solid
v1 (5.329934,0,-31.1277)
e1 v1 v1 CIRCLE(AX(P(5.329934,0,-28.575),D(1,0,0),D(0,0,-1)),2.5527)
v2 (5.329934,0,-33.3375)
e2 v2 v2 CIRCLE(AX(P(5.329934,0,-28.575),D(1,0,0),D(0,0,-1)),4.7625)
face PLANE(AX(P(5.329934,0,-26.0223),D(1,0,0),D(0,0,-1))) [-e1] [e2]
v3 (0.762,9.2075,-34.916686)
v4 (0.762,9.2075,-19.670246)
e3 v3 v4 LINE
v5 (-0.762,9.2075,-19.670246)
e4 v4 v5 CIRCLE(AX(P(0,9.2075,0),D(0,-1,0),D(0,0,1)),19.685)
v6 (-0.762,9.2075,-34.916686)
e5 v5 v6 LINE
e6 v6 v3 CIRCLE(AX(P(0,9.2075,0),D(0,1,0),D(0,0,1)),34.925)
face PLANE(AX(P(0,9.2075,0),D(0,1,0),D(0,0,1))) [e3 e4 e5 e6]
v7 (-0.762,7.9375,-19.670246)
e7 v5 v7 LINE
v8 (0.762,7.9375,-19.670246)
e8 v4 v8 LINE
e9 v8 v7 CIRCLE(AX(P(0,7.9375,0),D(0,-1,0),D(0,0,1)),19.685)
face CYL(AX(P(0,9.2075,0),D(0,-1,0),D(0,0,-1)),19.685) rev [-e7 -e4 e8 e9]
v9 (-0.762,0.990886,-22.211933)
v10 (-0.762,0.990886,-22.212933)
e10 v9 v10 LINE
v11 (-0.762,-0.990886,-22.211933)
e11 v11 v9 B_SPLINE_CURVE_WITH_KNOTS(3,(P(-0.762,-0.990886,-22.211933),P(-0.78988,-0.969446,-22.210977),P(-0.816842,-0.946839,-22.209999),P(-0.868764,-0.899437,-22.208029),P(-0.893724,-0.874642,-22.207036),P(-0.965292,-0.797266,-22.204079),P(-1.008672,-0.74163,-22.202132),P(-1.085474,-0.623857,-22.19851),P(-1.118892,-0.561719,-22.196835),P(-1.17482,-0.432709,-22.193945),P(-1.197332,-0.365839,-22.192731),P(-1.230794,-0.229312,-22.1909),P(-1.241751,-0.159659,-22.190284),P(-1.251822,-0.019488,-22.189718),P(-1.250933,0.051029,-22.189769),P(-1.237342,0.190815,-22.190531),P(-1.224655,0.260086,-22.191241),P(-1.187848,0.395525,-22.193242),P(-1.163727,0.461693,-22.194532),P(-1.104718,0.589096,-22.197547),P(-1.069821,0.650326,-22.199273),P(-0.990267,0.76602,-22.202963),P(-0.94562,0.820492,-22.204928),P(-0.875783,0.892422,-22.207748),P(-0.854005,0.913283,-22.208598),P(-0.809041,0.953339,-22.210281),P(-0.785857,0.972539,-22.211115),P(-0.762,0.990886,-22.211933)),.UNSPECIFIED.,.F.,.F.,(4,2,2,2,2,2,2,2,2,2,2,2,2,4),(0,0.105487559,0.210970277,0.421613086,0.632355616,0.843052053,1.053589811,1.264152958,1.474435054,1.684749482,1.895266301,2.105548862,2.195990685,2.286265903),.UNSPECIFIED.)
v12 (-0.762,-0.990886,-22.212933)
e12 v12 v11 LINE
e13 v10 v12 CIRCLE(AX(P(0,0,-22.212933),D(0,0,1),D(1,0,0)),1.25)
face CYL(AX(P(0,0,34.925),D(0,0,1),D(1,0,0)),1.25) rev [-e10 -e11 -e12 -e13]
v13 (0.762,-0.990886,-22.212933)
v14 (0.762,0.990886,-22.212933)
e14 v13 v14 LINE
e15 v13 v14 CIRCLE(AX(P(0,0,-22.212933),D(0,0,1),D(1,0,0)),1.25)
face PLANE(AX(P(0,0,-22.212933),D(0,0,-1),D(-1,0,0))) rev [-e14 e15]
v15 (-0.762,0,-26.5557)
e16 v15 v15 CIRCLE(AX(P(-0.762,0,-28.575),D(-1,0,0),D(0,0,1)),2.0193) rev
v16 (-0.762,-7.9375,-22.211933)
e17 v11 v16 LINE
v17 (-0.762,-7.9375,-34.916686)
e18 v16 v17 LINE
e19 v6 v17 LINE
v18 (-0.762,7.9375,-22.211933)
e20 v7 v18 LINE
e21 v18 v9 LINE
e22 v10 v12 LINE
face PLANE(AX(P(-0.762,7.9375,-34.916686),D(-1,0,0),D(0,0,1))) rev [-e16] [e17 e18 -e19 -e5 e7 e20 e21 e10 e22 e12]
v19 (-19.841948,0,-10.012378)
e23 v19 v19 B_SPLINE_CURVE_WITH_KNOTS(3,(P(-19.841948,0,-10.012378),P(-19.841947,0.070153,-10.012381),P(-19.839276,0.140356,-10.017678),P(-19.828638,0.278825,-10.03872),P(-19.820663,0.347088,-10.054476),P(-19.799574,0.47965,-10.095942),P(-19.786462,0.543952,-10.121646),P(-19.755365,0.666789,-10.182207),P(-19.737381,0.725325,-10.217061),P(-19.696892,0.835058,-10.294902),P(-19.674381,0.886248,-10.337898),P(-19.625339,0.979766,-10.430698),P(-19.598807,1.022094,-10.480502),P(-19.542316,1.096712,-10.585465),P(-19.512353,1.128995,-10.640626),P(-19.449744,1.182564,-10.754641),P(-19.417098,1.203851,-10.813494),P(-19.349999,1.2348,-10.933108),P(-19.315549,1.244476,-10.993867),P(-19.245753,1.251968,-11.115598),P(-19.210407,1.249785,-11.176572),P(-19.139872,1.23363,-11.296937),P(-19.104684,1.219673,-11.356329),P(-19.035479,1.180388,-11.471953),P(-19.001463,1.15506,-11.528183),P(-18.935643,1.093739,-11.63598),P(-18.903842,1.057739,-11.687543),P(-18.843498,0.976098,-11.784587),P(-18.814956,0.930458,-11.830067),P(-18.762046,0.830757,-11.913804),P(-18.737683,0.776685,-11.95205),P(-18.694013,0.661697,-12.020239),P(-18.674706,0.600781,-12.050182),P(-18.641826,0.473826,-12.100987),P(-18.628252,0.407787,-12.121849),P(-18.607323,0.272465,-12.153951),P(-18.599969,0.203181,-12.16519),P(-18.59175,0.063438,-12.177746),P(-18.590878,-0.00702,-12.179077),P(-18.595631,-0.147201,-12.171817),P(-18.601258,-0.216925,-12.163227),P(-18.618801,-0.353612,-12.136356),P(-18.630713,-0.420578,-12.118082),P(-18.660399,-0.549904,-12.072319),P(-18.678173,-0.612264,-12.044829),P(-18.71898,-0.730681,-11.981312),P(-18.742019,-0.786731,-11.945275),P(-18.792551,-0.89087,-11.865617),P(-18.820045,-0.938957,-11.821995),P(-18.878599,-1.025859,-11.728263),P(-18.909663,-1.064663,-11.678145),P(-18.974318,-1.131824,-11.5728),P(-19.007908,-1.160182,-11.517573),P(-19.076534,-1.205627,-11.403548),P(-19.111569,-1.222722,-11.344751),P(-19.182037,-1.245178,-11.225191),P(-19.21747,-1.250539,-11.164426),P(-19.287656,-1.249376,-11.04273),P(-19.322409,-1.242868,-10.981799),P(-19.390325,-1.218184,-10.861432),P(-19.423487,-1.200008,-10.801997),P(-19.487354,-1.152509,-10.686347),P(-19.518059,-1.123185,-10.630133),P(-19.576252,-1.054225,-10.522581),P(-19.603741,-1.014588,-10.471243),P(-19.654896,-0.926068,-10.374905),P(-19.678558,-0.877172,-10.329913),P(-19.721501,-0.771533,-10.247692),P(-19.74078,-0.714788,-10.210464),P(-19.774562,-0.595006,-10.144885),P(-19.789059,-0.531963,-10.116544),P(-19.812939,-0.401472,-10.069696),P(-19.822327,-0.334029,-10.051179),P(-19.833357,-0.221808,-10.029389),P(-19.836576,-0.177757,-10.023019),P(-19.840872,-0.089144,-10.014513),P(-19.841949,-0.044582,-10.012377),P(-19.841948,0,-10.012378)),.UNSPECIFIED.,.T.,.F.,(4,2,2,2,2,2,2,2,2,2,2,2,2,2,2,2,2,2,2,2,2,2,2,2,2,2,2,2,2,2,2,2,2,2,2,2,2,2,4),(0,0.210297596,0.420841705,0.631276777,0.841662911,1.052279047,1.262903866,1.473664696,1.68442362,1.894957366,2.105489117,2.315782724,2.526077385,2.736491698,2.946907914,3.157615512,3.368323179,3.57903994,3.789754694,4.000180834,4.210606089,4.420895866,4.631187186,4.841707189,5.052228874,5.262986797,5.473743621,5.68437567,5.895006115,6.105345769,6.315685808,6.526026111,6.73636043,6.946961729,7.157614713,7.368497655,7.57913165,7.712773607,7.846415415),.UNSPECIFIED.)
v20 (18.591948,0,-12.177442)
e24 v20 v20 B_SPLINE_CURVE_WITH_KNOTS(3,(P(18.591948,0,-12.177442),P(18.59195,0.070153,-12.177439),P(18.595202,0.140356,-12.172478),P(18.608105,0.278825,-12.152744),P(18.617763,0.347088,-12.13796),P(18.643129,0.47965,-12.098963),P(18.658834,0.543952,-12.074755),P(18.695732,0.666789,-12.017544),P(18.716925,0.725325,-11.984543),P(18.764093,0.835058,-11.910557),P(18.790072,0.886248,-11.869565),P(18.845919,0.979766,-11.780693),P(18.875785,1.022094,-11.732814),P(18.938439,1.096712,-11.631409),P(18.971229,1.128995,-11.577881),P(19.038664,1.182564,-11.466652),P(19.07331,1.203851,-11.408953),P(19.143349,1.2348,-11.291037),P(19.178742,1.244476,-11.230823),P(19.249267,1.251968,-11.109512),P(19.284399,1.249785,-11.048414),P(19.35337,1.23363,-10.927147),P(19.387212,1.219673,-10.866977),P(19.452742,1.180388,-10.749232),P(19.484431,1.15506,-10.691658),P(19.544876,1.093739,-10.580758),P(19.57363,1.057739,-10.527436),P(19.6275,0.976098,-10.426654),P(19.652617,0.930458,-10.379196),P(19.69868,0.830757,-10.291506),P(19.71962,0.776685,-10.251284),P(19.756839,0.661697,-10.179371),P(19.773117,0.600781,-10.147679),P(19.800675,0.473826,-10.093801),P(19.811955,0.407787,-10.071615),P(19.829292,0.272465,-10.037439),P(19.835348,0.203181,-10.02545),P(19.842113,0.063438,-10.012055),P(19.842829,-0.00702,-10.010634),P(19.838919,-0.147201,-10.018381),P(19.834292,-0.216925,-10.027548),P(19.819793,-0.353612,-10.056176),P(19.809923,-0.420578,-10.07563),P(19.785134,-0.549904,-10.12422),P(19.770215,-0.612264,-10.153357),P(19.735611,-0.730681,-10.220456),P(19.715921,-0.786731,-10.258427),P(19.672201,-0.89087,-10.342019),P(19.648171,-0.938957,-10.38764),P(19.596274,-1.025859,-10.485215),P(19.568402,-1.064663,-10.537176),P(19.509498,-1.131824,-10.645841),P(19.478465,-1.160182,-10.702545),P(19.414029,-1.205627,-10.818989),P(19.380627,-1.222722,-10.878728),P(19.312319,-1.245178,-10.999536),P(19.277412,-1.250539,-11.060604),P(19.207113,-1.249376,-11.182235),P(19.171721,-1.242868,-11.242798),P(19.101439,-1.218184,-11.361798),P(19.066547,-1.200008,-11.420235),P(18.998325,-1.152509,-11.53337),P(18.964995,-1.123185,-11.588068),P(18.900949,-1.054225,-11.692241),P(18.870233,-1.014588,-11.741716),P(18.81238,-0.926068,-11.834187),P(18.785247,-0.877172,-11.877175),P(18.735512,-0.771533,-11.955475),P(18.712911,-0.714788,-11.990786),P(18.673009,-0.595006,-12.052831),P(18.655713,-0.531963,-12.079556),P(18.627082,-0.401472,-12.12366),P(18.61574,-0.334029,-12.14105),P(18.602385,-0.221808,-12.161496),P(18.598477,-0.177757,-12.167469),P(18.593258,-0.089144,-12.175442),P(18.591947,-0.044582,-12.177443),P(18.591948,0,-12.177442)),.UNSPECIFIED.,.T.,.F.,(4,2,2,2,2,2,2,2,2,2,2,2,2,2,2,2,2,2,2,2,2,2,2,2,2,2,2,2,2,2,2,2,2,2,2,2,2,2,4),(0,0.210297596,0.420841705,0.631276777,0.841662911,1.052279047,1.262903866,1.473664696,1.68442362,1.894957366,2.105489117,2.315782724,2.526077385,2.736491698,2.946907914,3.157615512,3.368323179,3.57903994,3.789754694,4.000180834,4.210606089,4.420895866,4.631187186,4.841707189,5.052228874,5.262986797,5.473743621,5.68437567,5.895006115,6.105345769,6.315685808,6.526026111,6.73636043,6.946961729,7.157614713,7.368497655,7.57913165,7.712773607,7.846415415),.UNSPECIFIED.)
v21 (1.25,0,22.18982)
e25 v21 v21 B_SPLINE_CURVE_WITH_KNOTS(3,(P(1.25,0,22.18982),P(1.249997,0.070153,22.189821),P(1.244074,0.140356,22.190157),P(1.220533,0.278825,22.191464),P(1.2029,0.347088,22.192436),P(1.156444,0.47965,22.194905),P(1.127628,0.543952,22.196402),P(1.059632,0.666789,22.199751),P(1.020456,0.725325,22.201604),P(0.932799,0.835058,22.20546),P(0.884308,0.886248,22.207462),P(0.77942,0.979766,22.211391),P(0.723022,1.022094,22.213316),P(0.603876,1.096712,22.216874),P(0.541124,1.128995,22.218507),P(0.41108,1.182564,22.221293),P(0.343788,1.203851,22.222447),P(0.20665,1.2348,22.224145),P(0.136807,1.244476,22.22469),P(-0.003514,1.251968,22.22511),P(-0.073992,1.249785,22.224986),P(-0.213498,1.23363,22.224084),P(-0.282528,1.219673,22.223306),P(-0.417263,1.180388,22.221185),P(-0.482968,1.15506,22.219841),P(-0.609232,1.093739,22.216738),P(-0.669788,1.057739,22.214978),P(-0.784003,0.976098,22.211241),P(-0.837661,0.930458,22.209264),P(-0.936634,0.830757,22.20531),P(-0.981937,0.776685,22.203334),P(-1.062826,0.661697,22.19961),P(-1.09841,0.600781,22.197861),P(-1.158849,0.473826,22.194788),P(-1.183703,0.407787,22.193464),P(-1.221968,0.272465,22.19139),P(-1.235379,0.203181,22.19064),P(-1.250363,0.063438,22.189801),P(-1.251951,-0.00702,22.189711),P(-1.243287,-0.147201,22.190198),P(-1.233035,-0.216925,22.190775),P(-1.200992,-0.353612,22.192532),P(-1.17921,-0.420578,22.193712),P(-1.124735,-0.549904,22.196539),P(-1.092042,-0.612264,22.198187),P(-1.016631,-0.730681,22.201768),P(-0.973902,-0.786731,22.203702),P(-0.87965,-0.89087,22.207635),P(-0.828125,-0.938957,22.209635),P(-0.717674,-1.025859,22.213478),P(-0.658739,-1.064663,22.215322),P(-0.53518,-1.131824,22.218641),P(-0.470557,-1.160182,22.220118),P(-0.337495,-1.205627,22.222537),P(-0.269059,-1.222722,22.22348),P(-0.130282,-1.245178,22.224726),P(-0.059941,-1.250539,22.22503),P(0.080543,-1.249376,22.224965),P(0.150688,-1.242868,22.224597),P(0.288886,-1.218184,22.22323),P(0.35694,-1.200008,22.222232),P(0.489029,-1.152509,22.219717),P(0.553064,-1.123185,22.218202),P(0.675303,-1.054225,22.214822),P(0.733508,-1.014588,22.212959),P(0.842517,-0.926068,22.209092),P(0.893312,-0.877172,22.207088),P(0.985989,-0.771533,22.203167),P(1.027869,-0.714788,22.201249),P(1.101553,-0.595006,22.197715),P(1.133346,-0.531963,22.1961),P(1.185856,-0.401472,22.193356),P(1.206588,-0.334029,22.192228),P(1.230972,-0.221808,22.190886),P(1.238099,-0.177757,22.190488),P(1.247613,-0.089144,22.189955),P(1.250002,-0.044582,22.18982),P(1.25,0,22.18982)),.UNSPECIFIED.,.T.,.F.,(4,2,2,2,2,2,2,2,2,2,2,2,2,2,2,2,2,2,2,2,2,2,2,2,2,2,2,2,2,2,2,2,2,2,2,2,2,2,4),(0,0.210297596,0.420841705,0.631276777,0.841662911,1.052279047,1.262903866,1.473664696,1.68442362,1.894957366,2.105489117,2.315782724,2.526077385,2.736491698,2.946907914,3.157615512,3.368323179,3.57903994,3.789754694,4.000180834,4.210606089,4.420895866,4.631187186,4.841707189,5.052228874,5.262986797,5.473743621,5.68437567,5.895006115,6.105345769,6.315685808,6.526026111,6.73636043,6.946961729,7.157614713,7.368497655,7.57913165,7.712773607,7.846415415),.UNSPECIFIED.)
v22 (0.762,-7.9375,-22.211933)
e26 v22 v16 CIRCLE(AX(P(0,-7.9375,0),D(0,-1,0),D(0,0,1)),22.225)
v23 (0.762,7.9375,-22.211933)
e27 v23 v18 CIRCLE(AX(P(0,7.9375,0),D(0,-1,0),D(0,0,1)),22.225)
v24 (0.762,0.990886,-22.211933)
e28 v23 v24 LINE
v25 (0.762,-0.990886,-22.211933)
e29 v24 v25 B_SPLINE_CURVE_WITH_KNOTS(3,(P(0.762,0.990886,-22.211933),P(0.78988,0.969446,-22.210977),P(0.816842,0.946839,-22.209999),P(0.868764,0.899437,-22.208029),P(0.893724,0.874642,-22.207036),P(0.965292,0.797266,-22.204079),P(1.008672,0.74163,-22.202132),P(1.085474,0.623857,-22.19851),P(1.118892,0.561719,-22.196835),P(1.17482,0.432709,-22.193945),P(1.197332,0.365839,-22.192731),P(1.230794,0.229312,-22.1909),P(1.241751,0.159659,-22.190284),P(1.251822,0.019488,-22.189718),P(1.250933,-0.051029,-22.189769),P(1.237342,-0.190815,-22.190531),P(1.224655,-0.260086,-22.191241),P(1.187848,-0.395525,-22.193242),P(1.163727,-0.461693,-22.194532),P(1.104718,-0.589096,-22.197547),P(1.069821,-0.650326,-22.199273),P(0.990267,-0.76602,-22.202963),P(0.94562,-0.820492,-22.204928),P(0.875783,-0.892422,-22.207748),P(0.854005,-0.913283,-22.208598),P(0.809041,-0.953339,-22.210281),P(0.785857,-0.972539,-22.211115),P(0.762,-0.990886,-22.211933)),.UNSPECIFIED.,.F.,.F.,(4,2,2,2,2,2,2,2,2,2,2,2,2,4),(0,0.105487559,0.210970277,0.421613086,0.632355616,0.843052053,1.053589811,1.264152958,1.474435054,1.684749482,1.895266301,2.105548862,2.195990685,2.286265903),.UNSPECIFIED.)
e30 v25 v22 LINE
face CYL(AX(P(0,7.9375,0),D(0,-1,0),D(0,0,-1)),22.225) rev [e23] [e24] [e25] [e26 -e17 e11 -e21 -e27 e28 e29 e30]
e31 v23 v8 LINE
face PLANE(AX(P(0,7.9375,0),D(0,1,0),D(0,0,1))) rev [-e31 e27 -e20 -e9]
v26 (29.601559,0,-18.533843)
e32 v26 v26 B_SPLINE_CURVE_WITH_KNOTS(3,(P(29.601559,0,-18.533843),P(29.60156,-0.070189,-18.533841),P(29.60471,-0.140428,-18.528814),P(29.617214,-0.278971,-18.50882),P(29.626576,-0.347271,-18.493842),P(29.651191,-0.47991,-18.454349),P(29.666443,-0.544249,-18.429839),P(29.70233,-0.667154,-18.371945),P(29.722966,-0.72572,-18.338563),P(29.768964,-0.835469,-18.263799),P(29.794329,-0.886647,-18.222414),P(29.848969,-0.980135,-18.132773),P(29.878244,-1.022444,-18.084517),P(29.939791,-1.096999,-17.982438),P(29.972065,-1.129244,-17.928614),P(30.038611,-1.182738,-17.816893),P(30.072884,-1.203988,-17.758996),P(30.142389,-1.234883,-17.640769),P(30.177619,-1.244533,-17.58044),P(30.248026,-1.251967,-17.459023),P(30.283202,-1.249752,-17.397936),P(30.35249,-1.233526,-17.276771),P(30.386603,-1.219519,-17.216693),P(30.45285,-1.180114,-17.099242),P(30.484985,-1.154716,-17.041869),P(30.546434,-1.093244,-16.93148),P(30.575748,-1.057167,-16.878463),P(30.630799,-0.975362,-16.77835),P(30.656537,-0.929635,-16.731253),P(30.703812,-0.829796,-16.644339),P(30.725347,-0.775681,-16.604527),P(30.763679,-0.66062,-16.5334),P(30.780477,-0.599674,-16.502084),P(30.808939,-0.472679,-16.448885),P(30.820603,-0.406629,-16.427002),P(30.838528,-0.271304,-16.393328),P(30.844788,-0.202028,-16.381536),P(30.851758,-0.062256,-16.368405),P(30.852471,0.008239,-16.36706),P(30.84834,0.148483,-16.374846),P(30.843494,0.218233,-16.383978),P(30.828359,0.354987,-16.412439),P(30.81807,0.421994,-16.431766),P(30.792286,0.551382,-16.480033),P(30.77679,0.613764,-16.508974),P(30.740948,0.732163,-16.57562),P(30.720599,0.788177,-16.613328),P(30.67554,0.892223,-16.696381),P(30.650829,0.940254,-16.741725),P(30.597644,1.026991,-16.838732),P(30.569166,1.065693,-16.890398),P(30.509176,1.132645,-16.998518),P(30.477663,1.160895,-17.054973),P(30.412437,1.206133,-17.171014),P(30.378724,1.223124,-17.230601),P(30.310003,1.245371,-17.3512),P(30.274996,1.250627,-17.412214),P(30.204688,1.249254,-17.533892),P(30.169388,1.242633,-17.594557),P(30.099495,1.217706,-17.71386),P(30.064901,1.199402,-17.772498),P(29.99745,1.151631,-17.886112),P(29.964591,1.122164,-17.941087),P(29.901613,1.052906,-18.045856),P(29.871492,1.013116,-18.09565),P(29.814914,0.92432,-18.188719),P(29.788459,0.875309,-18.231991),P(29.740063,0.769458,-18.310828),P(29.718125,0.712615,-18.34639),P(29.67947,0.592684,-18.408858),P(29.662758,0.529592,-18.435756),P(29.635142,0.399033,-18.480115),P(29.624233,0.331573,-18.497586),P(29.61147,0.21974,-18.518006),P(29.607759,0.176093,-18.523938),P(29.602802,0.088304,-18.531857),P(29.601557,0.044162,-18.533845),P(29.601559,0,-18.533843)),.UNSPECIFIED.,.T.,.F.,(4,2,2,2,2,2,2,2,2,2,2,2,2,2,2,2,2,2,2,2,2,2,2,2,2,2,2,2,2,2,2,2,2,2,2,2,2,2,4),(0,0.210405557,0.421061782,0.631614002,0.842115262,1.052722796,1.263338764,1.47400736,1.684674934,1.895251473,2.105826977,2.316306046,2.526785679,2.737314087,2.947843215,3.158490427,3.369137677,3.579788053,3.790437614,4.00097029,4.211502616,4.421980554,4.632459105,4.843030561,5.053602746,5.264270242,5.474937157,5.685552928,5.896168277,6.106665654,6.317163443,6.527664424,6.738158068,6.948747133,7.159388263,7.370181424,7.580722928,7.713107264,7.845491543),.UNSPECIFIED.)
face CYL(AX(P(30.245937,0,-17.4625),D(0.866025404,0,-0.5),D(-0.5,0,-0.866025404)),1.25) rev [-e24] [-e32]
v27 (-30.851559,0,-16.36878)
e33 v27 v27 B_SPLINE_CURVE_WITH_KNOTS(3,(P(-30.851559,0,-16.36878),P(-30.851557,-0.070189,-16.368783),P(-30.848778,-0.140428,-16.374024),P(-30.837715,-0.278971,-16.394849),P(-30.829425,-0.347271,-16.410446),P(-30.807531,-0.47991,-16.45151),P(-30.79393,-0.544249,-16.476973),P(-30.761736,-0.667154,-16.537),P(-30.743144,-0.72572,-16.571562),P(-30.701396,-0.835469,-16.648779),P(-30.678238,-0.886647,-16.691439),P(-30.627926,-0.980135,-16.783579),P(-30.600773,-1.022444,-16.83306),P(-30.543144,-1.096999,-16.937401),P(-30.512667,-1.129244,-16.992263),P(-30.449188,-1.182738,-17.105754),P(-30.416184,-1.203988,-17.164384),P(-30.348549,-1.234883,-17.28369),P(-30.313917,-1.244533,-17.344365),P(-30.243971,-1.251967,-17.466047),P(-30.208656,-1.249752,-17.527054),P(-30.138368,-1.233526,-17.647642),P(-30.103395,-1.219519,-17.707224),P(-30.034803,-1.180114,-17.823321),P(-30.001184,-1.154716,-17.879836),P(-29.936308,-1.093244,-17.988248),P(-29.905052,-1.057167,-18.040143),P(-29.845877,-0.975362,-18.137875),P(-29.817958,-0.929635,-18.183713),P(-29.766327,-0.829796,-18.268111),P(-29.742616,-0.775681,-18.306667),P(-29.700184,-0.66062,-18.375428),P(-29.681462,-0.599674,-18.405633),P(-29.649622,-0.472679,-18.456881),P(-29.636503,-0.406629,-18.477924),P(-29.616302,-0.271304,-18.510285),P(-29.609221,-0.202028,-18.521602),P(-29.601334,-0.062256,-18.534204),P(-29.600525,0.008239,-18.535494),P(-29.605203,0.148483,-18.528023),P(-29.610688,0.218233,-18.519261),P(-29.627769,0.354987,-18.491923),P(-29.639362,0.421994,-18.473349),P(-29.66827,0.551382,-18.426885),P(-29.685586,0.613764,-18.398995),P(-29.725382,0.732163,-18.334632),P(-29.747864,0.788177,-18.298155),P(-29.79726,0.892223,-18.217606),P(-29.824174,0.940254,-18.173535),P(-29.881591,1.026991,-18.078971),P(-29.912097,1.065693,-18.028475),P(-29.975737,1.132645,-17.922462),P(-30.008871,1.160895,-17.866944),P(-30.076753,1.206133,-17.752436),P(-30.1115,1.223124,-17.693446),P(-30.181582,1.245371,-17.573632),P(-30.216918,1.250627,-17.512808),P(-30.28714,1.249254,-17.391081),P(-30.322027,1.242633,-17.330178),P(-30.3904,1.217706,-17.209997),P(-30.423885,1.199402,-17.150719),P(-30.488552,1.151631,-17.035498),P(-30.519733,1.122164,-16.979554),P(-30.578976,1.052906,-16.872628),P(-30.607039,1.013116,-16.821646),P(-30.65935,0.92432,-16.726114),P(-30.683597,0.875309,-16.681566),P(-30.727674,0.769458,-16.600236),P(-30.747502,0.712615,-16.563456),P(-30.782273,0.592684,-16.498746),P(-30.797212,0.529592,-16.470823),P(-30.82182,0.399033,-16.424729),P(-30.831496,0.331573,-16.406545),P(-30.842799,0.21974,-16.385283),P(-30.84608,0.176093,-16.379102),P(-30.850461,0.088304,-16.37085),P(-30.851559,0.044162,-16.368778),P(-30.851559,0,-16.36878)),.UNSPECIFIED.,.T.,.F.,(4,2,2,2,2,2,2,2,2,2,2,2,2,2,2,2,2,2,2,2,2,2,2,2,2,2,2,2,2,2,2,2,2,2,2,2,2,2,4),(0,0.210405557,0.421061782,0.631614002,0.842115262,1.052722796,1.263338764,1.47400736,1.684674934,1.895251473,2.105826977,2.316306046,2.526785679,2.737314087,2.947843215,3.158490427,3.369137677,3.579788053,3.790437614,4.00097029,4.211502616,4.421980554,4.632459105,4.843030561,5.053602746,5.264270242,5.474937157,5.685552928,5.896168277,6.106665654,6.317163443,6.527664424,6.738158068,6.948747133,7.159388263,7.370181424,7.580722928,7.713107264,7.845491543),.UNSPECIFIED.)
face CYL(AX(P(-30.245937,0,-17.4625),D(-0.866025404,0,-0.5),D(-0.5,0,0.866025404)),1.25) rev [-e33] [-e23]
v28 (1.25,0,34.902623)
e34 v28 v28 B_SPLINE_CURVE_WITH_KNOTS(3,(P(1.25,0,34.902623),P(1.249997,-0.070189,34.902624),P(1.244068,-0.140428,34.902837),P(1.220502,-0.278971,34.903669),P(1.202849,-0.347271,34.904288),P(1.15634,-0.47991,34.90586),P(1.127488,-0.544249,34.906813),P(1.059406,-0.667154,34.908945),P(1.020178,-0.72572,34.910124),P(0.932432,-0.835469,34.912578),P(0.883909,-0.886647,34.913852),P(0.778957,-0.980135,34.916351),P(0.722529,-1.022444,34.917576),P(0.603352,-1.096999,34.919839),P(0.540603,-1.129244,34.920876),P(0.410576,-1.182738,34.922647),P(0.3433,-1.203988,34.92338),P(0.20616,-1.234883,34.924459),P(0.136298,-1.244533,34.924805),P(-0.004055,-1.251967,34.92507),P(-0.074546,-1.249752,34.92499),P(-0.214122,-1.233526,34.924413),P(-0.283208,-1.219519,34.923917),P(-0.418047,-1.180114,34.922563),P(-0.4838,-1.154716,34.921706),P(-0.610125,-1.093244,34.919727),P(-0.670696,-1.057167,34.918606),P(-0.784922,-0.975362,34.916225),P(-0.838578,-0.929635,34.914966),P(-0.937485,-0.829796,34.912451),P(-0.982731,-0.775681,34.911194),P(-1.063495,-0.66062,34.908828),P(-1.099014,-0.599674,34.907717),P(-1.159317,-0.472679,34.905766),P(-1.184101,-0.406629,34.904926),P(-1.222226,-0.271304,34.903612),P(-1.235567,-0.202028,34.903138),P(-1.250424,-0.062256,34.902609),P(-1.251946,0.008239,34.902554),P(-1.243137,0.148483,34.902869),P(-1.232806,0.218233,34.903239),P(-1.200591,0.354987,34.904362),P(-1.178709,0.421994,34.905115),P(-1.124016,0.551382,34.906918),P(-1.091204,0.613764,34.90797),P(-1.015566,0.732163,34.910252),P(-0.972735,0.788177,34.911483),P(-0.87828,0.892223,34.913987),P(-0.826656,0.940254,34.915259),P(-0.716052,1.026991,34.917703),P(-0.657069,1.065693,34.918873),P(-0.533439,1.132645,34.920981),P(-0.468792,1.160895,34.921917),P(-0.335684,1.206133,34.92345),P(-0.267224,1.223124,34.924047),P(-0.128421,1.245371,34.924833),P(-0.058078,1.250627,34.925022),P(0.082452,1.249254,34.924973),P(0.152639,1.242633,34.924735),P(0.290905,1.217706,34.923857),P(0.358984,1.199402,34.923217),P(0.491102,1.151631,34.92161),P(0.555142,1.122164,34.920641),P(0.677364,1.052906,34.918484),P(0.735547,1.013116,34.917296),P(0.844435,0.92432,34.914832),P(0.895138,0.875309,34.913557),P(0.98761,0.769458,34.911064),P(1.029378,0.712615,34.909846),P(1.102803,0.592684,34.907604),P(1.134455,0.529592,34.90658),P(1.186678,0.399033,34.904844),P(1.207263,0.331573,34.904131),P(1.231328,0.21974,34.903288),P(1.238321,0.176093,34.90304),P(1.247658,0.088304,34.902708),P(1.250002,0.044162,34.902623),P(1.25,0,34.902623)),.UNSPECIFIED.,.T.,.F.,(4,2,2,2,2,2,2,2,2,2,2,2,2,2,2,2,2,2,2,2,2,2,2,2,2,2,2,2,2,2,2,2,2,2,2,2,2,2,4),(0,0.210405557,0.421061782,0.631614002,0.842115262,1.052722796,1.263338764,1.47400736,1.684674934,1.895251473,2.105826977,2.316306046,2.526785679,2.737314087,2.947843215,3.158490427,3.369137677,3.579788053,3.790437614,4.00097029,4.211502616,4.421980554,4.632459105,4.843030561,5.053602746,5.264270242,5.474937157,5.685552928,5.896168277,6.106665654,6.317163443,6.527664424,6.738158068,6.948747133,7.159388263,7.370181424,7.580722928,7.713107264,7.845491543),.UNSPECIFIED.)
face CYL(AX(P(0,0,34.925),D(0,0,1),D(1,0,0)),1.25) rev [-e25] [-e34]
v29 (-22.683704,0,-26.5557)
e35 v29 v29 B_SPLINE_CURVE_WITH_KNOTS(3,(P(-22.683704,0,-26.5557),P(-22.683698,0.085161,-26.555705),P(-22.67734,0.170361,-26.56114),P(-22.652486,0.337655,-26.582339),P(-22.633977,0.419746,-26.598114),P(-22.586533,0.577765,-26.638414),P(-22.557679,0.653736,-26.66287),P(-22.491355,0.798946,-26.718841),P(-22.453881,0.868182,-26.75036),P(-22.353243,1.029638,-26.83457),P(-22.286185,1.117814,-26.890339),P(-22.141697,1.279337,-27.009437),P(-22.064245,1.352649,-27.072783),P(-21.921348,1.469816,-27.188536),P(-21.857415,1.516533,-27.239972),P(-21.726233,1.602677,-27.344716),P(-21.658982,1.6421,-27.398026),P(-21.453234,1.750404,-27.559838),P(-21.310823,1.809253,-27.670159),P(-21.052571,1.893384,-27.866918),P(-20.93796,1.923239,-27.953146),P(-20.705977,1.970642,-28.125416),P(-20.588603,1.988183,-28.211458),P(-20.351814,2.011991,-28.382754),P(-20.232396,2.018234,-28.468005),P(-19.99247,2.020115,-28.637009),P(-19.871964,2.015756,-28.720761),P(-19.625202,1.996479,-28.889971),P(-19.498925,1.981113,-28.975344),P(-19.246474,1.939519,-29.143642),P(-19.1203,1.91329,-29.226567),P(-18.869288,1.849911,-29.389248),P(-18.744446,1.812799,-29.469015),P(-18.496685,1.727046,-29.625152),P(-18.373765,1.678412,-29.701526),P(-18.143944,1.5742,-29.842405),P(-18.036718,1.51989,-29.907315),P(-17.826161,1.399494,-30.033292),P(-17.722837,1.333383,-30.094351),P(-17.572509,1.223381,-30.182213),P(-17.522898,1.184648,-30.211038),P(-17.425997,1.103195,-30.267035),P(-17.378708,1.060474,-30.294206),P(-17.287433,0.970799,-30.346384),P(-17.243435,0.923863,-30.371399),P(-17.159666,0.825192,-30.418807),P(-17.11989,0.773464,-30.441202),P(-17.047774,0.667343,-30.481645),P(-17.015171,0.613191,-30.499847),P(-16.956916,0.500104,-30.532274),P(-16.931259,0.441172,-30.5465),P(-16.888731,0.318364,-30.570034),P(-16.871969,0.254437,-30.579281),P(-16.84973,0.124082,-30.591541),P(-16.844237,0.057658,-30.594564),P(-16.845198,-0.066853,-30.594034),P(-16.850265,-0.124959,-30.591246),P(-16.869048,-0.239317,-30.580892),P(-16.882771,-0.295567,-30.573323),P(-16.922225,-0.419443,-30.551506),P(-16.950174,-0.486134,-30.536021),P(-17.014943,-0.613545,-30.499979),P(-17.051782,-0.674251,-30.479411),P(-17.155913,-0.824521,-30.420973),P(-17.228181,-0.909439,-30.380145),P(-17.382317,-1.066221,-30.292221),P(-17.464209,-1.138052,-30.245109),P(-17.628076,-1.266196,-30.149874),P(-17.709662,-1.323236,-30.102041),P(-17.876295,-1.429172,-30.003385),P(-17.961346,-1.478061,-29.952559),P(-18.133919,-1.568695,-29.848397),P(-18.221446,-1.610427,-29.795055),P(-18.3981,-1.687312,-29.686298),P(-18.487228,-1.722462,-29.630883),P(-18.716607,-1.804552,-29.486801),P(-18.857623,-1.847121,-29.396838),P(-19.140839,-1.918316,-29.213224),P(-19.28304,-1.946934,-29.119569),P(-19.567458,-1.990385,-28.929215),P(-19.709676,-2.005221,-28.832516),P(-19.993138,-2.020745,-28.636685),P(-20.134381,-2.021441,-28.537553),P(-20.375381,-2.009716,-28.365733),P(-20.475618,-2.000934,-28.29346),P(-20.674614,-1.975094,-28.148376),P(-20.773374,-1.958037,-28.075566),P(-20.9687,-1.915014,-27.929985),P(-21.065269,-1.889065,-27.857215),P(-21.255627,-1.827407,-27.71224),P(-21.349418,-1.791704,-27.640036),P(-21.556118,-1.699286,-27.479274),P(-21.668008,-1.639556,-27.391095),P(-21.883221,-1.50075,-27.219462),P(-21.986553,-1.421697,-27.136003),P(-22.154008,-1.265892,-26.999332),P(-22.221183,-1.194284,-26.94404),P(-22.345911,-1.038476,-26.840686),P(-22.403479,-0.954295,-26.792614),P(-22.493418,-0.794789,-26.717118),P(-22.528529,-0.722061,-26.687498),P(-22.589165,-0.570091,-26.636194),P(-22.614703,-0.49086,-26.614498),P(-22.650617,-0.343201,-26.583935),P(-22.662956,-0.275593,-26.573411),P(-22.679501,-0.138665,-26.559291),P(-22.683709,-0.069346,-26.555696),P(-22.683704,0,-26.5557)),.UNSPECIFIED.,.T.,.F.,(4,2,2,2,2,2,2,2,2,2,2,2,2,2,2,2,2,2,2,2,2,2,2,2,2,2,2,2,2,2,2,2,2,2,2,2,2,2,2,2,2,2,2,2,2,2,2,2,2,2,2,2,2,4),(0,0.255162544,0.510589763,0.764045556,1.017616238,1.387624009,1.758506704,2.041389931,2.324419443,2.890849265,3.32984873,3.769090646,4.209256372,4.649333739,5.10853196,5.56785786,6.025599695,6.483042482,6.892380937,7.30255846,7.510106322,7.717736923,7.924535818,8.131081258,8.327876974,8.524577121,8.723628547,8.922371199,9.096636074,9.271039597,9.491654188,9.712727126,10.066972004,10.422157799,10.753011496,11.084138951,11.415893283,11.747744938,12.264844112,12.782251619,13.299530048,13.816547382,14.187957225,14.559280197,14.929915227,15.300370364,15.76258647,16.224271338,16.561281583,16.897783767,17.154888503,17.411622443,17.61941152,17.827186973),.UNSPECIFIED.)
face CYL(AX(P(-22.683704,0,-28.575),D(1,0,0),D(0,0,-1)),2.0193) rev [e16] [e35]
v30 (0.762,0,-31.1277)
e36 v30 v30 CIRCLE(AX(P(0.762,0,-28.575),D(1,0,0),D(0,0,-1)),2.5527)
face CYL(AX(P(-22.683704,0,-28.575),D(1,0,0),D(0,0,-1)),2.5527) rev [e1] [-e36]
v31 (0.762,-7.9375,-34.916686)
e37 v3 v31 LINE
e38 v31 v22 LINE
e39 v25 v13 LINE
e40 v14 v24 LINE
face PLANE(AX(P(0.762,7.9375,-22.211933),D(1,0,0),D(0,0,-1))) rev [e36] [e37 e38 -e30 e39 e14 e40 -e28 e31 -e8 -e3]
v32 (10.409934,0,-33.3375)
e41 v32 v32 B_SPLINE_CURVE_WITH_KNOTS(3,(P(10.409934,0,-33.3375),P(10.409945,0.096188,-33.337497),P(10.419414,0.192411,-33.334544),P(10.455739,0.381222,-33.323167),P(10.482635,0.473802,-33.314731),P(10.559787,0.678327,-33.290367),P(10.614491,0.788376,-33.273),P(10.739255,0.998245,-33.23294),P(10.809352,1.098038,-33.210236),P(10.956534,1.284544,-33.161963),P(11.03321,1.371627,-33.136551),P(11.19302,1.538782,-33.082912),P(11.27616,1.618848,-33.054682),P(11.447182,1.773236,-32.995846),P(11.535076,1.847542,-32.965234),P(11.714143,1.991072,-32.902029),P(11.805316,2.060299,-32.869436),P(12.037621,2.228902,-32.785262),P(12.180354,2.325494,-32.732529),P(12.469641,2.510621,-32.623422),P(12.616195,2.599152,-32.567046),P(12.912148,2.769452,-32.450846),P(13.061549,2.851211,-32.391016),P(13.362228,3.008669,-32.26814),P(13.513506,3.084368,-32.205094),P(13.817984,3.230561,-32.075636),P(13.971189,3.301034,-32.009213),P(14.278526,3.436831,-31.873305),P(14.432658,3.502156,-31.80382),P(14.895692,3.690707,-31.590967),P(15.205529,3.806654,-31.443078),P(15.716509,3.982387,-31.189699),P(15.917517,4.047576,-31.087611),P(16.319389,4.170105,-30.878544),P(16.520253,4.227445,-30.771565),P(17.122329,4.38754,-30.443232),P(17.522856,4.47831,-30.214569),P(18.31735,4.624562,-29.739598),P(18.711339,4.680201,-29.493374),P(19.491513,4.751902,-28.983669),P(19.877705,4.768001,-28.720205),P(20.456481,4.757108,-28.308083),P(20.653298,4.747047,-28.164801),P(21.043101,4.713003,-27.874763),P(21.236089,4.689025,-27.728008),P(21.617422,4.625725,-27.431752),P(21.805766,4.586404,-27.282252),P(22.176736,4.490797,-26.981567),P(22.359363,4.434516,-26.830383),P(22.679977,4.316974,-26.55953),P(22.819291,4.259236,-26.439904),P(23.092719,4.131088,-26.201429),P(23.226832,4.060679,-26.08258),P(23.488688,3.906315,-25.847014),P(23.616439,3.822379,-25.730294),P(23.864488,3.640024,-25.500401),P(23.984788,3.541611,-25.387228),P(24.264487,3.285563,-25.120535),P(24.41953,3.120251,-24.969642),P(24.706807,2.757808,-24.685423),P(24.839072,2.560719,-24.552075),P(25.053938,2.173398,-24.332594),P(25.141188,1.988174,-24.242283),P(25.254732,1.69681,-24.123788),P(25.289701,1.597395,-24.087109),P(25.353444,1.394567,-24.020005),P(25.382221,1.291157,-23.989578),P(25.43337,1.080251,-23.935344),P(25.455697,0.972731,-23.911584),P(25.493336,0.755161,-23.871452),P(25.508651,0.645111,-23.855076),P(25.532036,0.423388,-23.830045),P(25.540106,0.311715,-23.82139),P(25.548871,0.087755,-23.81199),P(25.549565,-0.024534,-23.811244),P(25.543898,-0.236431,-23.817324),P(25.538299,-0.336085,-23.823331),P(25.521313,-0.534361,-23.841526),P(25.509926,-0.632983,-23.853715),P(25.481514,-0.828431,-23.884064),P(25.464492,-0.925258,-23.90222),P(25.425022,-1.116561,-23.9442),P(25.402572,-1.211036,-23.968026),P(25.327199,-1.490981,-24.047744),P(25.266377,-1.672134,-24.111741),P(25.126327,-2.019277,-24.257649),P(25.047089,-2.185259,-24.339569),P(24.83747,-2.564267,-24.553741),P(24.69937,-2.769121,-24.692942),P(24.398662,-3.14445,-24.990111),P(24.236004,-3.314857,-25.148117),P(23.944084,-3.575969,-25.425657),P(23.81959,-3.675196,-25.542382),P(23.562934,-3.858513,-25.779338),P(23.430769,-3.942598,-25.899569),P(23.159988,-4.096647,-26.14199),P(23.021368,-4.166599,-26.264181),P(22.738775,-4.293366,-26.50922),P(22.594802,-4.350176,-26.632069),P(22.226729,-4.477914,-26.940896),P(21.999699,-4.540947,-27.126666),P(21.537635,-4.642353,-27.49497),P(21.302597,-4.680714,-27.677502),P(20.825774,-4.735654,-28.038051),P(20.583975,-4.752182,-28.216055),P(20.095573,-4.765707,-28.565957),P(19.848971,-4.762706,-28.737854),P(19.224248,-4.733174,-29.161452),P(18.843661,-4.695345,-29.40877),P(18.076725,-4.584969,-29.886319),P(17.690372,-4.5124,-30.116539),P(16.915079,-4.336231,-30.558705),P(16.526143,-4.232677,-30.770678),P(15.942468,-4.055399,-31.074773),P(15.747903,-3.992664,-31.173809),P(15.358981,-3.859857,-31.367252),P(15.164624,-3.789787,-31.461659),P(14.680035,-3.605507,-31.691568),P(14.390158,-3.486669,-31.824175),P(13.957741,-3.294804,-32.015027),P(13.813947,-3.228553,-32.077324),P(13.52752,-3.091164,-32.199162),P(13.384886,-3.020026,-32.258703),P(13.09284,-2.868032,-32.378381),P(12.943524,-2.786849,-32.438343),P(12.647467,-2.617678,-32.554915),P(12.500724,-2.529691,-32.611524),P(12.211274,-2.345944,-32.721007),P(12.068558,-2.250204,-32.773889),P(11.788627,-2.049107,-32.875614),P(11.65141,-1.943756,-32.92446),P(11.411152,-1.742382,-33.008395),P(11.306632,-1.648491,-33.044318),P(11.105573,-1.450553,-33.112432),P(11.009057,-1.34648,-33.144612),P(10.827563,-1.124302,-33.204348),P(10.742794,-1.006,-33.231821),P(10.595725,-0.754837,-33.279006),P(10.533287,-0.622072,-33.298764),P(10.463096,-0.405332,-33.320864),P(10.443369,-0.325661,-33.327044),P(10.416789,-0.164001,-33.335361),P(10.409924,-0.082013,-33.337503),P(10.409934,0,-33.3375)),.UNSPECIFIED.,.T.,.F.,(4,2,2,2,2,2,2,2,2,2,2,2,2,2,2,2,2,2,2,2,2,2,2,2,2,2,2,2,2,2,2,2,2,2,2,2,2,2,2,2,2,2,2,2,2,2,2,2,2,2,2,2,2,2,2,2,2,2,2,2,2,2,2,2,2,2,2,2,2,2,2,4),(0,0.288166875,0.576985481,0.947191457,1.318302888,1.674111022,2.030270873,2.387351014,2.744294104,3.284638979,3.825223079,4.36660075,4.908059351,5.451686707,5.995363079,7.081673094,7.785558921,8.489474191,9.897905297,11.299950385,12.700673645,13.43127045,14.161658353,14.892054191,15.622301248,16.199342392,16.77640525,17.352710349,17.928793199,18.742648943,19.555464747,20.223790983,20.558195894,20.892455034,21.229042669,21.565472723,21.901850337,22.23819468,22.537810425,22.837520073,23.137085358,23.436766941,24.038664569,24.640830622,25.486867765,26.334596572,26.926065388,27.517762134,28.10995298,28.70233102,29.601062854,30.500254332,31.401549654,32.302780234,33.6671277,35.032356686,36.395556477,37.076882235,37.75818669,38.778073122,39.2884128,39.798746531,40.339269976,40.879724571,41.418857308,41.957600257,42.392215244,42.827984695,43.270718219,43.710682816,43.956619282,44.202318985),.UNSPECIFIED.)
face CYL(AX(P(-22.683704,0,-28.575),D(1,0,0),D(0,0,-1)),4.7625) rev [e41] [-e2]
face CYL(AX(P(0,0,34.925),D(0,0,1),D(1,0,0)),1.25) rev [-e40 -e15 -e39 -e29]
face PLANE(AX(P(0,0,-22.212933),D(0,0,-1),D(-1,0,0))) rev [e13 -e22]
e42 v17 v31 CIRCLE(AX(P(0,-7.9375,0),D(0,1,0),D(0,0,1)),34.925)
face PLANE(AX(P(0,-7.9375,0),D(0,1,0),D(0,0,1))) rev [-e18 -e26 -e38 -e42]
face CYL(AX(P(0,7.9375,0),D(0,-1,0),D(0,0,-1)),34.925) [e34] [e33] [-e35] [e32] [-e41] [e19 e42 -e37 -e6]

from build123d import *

# Parameters (mm, degrees)
BOSS_EXTRUDE1_DEPTH        = 7.9375
F_2_5MM_DOWEL_HOLE1_REACH  = 85.992
F_2_5MM_DOWEL_HOLE1_BORE_R = 1.25
CIRPATTERN1_START          = -22.212933302
CIRPATTERN1_DEPTH          = 57.137933384
CIRPATTERN1_START_2        = -34.9250001
CIRPATTERN1_2_OUTLINE_R    = 1.25
CIRPATTERN1_2_DEPTH        = 12.735179899
BOSS_EXTRUDE2_START        = 1.27
BOSS_EXTRUDE2_DEPTH        = 1.27


# Read off the part's stored shape, not the designer's step: CirPattern1
with BuildPart() as part:
    # Sketch1 → Boss-Extrude1 (new, symmetric)
    with BuildSketch(Plane(origin=(0, 0, 0), x_dir=(1, 0, 0), z_dir=(0, 1, 0))):
        with BuildLine():
            Line((-0.762, 34.916686283), (-0.762, 22.211933302))
            ThreePointArc((-0.762, 22.211933302), (0, -22.225), (0.762, 22.211933302))
            Line((0.762, 22.211933302), (0.762, 34.916686283))
            ThreePointArc((0.762, 34.916686283), (0, -34.925), (-0.762, 34.916686283))
        make_face()
    extrude(amount=BOSS_EXTRUDE1_DEPTH, both=True)

    # Sketch2 → Cut-Revolve1 (revolve, cut)
    with BuildSketch(Plane(origin=(0, 0, 0), x_dir=(1, 0, 0), z_dir=(0, 1, 0)), mode=Mode.PRIVATE) as cut_revolve1_sk:
        Polygon((-22.683703898, 26.5557), (0.762, 26.5557), (0.762, 26.0223), (5.329933657, 26.0223), (5.329933657, 23.8125), (25.548394641, 23.8125), (25.548394641, 28.575), (-22.683703898, 28.575), align=None)
    revolve(cut_revolve1_sk.sketch.rotate(Axis((-22.683703898, 0, -28.575), (-1, 0, 0)), 180), axis=Axis((-22.683703898, 0, -28.575), (-1, 0, 0)), mode=Mode.SUBTRACT)

    # Ø2.5mm Dowel Hole1 bore (on position points) → Ø2.5mm Dowel Hole1 (cut, up to next)
    with BuildSketch(Plane(origin=(30.245937227, 0, -17.4625), x_dir=(0.5, 0, 0.866025403784), z_dir=(0.866025403784, 0, -0.5)), mode=Mode.PRIVATE) as f_2_5mm_dowel_hole1_sk1:
        Circle(F_2_5MM_DOWEL_HOLE1_BORE_R)
    f_2_5mm_dowel_hole1_tool1 = extrude(f_2_5mm_dowel_hole1_sk1.sketch, amount=-F_2_5MM_DOWEL_HOLE1_REACH, mode=Mode.PRIVATE) & part.part
    add(f_2_5mm_dowel_hole1_tool1.solids().sort_by_distance((30.245937, 0, -17.4625))[0], mode=Mode.SUBTRACT)

    # CirPattern1 outline → CirPattern1 (cut)
    with BuildSketch(Plane.XY.offset(CIRPATTERN1_START)):
        with BuildLine():
            ThreePointArc((-0.762, -0.990886472), (1.25, 0), (-0.762, 0.990886472))
            ThreePointArc((-0.762, 0.990886472), (-1.25, 0), (-0.762, -0.990886472))
        make_face()
    extrude(amount=CIRPATTERN1_DEPTH, mode=Mode.SUBTRACT)

    # CirPattern1 2 outline → CirPattern1 2 (cut)
    with BuildSketch(Plane(origin=(0, 0, 0), x_dir=(0.500000000000004, 0, -0.8660254037844363), z_dir=(0.8660254037844363, 0, 0.5000000000000042)).offset(CIRPATTERN1_START_2)):
        Circle(CIRPATTERN1_2_OUTLINE_R)
    extrude(amount=CIRPATTERN1_2_DEPTH, mode=Mode.SUBTRACT)

    # Sketch4 → Boss-Extrude2 (add)
    with BuildSketch(Plane(origin=(0, 7.9375, 0), x_dir=(1, 0, 0), z_dir=(0, 1, 0)).offset(BOSS_EXTRUDE2_START)):
        with BuildLine():
            Line((0.762, 34.916686283), (0.762, 19.670246084))
            ThreePointArc((0.762, 19.670246084), (0, -19.685), (-0.762, 19.670246084))
            Line((-0.762, 19.670246084), (-0.762, 34.916686283))
            ThreePointArc((-0.762, 34.916686283), (0, -34.925), (0.762, 34.916686283))
        make_face()
    extrude(amount=-BOSS_EXTRUDE2_DEPTH)


solid = part.part
